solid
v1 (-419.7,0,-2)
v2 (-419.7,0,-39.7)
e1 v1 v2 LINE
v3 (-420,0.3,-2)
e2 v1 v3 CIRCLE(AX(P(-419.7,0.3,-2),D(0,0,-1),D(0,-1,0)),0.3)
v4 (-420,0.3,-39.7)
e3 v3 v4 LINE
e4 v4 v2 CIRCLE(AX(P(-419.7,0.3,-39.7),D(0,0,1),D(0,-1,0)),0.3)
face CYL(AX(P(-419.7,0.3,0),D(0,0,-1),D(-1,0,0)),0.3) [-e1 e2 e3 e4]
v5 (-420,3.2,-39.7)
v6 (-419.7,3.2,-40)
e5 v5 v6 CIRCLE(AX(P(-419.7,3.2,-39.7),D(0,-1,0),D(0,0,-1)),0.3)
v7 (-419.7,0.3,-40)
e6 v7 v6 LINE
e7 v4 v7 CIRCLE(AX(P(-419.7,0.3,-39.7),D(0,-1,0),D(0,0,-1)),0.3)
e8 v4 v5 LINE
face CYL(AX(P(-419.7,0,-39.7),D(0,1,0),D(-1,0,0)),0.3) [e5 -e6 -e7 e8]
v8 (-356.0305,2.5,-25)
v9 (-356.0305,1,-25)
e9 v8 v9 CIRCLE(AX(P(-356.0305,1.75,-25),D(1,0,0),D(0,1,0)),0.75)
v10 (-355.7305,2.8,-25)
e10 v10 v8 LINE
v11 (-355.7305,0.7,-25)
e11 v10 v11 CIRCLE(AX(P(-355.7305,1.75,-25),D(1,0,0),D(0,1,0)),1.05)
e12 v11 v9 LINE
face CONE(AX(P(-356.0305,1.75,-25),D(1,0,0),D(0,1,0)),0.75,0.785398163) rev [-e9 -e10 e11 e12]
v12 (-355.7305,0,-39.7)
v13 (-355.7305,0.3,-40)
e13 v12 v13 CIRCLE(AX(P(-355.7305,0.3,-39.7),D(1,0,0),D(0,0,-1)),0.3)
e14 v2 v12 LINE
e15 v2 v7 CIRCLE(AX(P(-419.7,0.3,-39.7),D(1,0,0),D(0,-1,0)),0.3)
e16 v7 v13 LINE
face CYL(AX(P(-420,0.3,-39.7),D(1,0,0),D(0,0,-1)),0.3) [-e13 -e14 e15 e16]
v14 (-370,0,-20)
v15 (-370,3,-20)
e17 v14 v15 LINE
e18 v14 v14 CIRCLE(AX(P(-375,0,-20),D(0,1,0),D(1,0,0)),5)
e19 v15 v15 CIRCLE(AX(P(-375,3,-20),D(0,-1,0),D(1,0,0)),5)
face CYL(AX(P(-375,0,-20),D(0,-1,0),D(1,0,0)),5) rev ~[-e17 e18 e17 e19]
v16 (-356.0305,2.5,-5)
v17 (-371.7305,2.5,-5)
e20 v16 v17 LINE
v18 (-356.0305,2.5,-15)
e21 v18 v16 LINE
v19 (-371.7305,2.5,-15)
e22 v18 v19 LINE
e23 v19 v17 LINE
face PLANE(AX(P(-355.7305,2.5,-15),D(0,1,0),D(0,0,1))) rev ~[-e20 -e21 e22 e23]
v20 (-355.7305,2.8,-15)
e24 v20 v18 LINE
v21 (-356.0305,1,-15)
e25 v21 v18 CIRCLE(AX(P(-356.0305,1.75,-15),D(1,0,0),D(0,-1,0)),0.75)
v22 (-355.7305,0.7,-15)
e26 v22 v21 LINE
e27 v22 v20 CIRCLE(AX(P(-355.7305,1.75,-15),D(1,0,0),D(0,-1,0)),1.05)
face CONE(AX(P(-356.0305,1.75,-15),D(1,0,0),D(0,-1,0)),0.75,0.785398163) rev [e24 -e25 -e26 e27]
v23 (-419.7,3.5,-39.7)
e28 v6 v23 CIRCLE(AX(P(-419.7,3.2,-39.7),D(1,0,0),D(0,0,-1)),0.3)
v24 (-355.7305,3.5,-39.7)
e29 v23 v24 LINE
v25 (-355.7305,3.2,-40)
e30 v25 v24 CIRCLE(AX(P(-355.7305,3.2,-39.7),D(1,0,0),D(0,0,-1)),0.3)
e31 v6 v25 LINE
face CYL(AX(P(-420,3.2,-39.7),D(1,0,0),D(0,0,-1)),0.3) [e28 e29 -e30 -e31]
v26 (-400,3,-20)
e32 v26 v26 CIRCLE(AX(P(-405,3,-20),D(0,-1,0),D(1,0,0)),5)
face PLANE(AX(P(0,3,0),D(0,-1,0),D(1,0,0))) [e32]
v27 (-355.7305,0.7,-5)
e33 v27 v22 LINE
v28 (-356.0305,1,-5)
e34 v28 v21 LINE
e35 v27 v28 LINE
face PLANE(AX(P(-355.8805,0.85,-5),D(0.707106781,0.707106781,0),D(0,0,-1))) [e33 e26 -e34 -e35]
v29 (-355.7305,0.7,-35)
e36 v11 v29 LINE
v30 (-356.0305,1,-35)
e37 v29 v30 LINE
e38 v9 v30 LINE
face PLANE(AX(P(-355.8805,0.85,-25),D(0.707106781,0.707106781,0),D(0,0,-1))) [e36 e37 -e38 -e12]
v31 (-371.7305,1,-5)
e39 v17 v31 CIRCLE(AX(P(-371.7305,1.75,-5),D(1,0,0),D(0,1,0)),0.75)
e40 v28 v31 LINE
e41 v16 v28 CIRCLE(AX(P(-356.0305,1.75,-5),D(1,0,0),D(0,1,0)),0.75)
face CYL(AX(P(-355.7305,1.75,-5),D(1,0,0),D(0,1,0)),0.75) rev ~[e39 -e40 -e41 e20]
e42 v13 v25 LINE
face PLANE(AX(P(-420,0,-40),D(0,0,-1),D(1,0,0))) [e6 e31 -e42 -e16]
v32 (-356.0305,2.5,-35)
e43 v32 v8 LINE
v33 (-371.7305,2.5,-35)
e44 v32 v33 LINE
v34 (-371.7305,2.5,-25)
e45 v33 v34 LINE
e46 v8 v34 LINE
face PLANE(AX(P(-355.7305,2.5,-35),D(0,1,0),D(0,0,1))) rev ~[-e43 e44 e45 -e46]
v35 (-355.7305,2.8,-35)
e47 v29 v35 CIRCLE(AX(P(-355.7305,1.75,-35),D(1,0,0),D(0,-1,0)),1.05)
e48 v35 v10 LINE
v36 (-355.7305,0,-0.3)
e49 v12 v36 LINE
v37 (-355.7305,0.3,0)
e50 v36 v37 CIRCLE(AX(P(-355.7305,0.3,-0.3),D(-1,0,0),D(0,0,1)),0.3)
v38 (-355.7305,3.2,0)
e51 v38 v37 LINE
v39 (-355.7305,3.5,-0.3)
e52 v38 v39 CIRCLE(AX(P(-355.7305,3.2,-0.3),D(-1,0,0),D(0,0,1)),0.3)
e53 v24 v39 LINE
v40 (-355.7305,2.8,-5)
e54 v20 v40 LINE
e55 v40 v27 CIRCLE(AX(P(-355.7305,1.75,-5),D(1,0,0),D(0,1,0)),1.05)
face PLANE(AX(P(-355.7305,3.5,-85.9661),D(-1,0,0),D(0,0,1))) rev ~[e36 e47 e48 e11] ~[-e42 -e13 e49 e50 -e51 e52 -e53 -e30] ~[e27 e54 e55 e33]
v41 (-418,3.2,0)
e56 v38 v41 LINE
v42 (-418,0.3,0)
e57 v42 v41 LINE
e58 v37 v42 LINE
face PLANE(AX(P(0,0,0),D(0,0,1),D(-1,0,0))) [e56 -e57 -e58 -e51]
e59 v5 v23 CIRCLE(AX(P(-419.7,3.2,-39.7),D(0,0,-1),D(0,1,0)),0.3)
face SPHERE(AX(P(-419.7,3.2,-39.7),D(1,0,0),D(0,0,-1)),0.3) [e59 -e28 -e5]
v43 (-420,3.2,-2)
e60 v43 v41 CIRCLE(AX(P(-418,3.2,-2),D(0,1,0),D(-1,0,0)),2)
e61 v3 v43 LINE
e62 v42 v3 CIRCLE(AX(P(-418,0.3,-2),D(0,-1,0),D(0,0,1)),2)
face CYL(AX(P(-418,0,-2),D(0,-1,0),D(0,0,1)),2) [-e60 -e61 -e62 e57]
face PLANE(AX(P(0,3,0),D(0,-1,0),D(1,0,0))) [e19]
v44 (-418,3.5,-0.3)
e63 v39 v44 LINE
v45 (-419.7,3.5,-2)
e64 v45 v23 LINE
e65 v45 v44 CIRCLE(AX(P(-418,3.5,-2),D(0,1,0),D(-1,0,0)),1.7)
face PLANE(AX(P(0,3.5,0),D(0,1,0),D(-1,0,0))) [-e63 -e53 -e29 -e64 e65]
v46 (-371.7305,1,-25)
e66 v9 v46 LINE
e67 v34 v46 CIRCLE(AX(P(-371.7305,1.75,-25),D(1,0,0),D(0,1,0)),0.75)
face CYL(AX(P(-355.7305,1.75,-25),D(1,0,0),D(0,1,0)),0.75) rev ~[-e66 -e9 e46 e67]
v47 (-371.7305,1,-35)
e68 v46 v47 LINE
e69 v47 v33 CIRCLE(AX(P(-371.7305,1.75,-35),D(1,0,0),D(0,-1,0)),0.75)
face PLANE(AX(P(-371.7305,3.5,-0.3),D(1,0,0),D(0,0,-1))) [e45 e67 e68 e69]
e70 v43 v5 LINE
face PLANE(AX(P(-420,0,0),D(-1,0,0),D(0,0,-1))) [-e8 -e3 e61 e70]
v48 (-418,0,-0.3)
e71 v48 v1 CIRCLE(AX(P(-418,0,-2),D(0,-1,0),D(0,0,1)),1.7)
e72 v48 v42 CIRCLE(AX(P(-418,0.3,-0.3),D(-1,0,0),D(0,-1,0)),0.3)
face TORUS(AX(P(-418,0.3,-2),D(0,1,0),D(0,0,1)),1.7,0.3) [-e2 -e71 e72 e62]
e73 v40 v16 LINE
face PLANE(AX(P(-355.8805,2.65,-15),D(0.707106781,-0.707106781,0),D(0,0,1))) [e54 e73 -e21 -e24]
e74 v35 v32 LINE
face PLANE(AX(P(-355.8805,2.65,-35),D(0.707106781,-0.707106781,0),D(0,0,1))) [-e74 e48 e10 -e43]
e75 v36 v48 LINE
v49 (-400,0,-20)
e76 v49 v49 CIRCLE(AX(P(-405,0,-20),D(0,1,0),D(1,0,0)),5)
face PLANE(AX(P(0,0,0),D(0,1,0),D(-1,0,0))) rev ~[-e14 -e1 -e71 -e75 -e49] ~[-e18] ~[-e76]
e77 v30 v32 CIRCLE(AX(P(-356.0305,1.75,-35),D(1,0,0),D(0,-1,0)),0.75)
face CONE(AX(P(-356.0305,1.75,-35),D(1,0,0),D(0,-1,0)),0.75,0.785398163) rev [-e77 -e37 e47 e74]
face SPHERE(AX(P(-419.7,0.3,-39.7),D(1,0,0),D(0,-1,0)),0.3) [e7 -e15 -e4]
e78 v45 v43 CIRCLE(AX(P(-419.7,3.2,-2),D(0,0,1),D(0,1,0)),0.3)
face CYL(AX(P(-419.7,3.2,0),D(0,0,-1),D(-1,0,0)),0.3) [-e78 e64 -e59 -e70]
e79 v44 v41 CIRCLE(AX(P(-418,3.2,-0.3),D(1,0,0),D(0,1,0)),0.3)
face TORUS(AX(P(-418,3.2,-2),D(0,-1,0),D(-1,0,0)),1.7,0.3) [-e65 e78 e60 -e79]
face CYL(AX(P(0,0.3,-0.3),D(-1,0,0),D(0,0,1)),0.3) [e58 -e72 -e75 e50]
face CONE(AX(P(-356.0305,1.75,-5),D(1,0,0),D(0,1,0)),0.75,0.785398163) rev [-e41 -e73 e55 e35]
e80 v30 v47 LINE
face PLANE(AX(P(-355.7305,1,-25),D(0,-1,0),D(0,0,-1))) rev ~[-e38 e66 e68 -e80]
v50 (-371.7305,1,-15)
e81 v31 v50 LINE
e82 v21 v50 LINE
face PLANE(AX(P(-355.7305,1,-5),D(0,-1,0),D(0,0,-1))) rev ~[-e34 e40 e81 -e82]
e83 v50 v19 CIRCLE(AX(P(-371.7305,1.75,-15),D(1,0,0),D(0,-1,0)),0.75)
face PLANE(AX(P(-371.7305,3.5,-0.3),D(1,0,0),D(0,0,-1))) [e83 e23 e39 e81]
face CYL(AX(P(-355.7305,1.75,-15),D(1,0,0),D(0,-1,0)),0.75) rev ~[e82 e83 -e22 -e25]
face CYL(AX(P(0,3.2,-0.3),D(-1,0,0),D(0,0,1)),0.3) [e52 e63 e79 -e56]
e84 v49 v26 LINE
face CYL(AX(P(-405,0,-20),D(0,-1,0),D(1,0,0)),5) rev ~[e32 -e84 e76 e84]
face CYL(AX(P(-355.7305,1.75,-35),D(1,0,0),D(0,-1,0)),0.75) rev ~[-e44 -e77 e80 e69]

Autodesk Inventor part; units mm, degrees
ref_plane "YZ Plane" through (0, 0, 0) normal (1, 0, 0) x (0, 1, 0)
ref_plane "XZ Plane" through (0, 0, 0) normal (0, 1, 0) x (-1, 0, 0)
sketch "Sketch1" plane through (0, 0, 0) normal (0, 1, 0) x (-1, 0, 0)
  line L0 (0, 0) -> (420, 0)
  line L1 (420, 0) -> (420, -40)
  line L2 (420, -40) -> (0, -40)
  line L3 (0, -40) -> (0, 0)
  dimension "d0" = 420
  dimension "d1" = 40
extrude "Extrusion1" add sketch "Sketch1" along normal blind 3.5
fillet "Fillet1" radius 0.3 10 edges at (-210, 3.5, 0) (-210, 0, 0) (0, 0, -20) (0, 3.5, -20) (0, 1.75, -40) (-210, 3.5, -40) (-210, 0, -40) (-420, 0, -20) (-420, 1.75, -40) (-420, 3.5, -20)
sketch "Sketch2" plane through (0, 0, 0) normal (0, -1, 0) x (1, 0, 0)
  line L0 (-419.7, -39.7) -> (-419.7, -0.3) projected
  line L1 (-419.7, -20) -> (0, -20)
  circle A0 centre (-405, -20) radius 5
  circle A1 centre (-375, -20) radius 5
  circle A2 centre (-345, -20) radius 5
  circle A3 centre (-315, -20) radius 5
  line L2 (-420, 0) -> (-420, -39.7) projected
  line L3 (-315, -20) -> (-315, -8.0411)
  line L4 (-210.3, -20) -> (-630, -20)
  circle A4 centre (-225, -20) radius 5
  circle A5 centre (-255, -20) radius 5
  circle A6 centre (-285, -20) radius 5
  point P0 (0, 0)
  point P1 (-420, -0.3)
  dimension "d5" = 10
  dimension "d6" = 10
  dimension "d7" = 10
  dimension "d8" = 10
  dimension "d9" = 15
  dimension "d10" = 30
  dimension "d11" = 30
  dimension "d12" = 30
ref_plane "Work Plane1" through (-210, 0.3, -39.7) normal (1, 0, 0) x (0, 0, -1)
extrude "Extrusion2" cut sketch "Sketch2" against normal blind 3
mirror "Mirror1" about plane through (-210, 0.3, -39.7) normal (1, 0, 0) of "Extrusion2"
fillet "Fillet2" radius 2 6 edges at (-0.0879, 3.4121, -0.0879) (-0.0879, 0.0879, -0.0879) (0, 1.75, 0) (-419.9121, 3.4121, -0.0879) (-419.9121, 0.0879, -0.0879) (-420, 1.75, 0)
sketch "Sketch3" plane through (0, 3.5, 0) normal (0, 1, 0) x (1, 0, 0)
  line L0 (4.2695, -58.2258) -> (-175.7305, -58.2258)
  line L1 (-175.7305, -58.2258) -> (-175.7305, 85.9661)
  line L2 (-175.7305, 85.9661) -> (4.2695, 85.9661)
  line L3 (4.2695, 85.9661) -> (4.2695, -58.2258)
  line L4 (-175.7305, 85.9661) -> (-355.7305, 85.9661)
  line L5 (-355.7305, 85.9661) -> (-355.7305, -58.2258)
  line L6 (-355.7305, -58.2258) -> (-175.7305, -58.2258)
  line L7 (-175.7305, -58.2258) -> (-175.7305, 85.9661)
  line L8 (-355.7305, -58.2258) -> (-453.8172, -58.2258)
  line L9 (-453.8172, -58.2258) -> (-453.8172, 85.9661)
  line L10 (-453.8172, 85.9661) -> (-355.7305, 85.9661)
  line L11 (-355.7305, 85.9661) -> (-355.7305, -58.2258)
  point P0 (0, 0)
  dimension "d18" = 180
  dimension "d19" = 180
extrude "Extrusion8" cut sketch "Sketch3" against normal through all contours L0 L1 L2 L3 | L6 L5 L4 L1
sketch "Sketch7" plane through (-355.7305, 3.5, -0.3) normal (1, 0, 0) x (0, 0, -1)
  line L0 (4.7, -1.75) -> (14.7, -1.75) construction
  line L1 (-0.3, -3.2) -> (-0.3, -0.3) projected
  line L2 (4.7, -2.5) -> (14.7, -2.5)
  line L3 (14.7, -1) -> (4.7, -1)
  arc A0 (4.7, -1) -> (4.7, -2.5) centre (4.7, -1.75) ccw
  arc A1 (14.7, -2.5) -> (14.7, -1) centre (14.7, -1.75) ccw
  line L4 (24.7, -1.75) -> (34.7, -1.75) construction
  line L5 (24.7, -2.5) -> (34.7, -2.5)
  line L6 (34.7, -1) -> (24.7, -1)
  arc A2 (24.7, -1) -> (24.7, -2.5) centre (24.7, -1.75) ccw
  arc A3 (34.7, -2.5) -> (34.7, -1) centre (34.7, -1.75) ccw
  line L7 (39.7, -0.3) -> (39.7, -3.2) projected
  point P0 (-0.3, -3.5)
  point P1 (9.7, -1.75)
  point P2 (29.7, -1.75)
  dimension "d56" = 5
  dimension "d57" = 1.5
  dimension "d58" = 5
  dimension "d59" = 1.5
  dimension "d60" = 10
  dimension "d61" = 10
extrude "Extrusion9" cut sketch "Sketch7" against normal blind 16
chamfer "Chamfer3" distance 0.3 angle 45 8 edges at (-355.7305, 2.5, -10) (-355.7305, 1.75, -15.75) (-355.7305, 1, -10) (-355.7305, 1.75, -4.25) (-355.7305, 1.75, -24.25) (-355.7305, 2.5, -30) (-355.7305, 1.75, -35.75) (-355.7305, 1, -30)
properties part number "LeftClamo3"
